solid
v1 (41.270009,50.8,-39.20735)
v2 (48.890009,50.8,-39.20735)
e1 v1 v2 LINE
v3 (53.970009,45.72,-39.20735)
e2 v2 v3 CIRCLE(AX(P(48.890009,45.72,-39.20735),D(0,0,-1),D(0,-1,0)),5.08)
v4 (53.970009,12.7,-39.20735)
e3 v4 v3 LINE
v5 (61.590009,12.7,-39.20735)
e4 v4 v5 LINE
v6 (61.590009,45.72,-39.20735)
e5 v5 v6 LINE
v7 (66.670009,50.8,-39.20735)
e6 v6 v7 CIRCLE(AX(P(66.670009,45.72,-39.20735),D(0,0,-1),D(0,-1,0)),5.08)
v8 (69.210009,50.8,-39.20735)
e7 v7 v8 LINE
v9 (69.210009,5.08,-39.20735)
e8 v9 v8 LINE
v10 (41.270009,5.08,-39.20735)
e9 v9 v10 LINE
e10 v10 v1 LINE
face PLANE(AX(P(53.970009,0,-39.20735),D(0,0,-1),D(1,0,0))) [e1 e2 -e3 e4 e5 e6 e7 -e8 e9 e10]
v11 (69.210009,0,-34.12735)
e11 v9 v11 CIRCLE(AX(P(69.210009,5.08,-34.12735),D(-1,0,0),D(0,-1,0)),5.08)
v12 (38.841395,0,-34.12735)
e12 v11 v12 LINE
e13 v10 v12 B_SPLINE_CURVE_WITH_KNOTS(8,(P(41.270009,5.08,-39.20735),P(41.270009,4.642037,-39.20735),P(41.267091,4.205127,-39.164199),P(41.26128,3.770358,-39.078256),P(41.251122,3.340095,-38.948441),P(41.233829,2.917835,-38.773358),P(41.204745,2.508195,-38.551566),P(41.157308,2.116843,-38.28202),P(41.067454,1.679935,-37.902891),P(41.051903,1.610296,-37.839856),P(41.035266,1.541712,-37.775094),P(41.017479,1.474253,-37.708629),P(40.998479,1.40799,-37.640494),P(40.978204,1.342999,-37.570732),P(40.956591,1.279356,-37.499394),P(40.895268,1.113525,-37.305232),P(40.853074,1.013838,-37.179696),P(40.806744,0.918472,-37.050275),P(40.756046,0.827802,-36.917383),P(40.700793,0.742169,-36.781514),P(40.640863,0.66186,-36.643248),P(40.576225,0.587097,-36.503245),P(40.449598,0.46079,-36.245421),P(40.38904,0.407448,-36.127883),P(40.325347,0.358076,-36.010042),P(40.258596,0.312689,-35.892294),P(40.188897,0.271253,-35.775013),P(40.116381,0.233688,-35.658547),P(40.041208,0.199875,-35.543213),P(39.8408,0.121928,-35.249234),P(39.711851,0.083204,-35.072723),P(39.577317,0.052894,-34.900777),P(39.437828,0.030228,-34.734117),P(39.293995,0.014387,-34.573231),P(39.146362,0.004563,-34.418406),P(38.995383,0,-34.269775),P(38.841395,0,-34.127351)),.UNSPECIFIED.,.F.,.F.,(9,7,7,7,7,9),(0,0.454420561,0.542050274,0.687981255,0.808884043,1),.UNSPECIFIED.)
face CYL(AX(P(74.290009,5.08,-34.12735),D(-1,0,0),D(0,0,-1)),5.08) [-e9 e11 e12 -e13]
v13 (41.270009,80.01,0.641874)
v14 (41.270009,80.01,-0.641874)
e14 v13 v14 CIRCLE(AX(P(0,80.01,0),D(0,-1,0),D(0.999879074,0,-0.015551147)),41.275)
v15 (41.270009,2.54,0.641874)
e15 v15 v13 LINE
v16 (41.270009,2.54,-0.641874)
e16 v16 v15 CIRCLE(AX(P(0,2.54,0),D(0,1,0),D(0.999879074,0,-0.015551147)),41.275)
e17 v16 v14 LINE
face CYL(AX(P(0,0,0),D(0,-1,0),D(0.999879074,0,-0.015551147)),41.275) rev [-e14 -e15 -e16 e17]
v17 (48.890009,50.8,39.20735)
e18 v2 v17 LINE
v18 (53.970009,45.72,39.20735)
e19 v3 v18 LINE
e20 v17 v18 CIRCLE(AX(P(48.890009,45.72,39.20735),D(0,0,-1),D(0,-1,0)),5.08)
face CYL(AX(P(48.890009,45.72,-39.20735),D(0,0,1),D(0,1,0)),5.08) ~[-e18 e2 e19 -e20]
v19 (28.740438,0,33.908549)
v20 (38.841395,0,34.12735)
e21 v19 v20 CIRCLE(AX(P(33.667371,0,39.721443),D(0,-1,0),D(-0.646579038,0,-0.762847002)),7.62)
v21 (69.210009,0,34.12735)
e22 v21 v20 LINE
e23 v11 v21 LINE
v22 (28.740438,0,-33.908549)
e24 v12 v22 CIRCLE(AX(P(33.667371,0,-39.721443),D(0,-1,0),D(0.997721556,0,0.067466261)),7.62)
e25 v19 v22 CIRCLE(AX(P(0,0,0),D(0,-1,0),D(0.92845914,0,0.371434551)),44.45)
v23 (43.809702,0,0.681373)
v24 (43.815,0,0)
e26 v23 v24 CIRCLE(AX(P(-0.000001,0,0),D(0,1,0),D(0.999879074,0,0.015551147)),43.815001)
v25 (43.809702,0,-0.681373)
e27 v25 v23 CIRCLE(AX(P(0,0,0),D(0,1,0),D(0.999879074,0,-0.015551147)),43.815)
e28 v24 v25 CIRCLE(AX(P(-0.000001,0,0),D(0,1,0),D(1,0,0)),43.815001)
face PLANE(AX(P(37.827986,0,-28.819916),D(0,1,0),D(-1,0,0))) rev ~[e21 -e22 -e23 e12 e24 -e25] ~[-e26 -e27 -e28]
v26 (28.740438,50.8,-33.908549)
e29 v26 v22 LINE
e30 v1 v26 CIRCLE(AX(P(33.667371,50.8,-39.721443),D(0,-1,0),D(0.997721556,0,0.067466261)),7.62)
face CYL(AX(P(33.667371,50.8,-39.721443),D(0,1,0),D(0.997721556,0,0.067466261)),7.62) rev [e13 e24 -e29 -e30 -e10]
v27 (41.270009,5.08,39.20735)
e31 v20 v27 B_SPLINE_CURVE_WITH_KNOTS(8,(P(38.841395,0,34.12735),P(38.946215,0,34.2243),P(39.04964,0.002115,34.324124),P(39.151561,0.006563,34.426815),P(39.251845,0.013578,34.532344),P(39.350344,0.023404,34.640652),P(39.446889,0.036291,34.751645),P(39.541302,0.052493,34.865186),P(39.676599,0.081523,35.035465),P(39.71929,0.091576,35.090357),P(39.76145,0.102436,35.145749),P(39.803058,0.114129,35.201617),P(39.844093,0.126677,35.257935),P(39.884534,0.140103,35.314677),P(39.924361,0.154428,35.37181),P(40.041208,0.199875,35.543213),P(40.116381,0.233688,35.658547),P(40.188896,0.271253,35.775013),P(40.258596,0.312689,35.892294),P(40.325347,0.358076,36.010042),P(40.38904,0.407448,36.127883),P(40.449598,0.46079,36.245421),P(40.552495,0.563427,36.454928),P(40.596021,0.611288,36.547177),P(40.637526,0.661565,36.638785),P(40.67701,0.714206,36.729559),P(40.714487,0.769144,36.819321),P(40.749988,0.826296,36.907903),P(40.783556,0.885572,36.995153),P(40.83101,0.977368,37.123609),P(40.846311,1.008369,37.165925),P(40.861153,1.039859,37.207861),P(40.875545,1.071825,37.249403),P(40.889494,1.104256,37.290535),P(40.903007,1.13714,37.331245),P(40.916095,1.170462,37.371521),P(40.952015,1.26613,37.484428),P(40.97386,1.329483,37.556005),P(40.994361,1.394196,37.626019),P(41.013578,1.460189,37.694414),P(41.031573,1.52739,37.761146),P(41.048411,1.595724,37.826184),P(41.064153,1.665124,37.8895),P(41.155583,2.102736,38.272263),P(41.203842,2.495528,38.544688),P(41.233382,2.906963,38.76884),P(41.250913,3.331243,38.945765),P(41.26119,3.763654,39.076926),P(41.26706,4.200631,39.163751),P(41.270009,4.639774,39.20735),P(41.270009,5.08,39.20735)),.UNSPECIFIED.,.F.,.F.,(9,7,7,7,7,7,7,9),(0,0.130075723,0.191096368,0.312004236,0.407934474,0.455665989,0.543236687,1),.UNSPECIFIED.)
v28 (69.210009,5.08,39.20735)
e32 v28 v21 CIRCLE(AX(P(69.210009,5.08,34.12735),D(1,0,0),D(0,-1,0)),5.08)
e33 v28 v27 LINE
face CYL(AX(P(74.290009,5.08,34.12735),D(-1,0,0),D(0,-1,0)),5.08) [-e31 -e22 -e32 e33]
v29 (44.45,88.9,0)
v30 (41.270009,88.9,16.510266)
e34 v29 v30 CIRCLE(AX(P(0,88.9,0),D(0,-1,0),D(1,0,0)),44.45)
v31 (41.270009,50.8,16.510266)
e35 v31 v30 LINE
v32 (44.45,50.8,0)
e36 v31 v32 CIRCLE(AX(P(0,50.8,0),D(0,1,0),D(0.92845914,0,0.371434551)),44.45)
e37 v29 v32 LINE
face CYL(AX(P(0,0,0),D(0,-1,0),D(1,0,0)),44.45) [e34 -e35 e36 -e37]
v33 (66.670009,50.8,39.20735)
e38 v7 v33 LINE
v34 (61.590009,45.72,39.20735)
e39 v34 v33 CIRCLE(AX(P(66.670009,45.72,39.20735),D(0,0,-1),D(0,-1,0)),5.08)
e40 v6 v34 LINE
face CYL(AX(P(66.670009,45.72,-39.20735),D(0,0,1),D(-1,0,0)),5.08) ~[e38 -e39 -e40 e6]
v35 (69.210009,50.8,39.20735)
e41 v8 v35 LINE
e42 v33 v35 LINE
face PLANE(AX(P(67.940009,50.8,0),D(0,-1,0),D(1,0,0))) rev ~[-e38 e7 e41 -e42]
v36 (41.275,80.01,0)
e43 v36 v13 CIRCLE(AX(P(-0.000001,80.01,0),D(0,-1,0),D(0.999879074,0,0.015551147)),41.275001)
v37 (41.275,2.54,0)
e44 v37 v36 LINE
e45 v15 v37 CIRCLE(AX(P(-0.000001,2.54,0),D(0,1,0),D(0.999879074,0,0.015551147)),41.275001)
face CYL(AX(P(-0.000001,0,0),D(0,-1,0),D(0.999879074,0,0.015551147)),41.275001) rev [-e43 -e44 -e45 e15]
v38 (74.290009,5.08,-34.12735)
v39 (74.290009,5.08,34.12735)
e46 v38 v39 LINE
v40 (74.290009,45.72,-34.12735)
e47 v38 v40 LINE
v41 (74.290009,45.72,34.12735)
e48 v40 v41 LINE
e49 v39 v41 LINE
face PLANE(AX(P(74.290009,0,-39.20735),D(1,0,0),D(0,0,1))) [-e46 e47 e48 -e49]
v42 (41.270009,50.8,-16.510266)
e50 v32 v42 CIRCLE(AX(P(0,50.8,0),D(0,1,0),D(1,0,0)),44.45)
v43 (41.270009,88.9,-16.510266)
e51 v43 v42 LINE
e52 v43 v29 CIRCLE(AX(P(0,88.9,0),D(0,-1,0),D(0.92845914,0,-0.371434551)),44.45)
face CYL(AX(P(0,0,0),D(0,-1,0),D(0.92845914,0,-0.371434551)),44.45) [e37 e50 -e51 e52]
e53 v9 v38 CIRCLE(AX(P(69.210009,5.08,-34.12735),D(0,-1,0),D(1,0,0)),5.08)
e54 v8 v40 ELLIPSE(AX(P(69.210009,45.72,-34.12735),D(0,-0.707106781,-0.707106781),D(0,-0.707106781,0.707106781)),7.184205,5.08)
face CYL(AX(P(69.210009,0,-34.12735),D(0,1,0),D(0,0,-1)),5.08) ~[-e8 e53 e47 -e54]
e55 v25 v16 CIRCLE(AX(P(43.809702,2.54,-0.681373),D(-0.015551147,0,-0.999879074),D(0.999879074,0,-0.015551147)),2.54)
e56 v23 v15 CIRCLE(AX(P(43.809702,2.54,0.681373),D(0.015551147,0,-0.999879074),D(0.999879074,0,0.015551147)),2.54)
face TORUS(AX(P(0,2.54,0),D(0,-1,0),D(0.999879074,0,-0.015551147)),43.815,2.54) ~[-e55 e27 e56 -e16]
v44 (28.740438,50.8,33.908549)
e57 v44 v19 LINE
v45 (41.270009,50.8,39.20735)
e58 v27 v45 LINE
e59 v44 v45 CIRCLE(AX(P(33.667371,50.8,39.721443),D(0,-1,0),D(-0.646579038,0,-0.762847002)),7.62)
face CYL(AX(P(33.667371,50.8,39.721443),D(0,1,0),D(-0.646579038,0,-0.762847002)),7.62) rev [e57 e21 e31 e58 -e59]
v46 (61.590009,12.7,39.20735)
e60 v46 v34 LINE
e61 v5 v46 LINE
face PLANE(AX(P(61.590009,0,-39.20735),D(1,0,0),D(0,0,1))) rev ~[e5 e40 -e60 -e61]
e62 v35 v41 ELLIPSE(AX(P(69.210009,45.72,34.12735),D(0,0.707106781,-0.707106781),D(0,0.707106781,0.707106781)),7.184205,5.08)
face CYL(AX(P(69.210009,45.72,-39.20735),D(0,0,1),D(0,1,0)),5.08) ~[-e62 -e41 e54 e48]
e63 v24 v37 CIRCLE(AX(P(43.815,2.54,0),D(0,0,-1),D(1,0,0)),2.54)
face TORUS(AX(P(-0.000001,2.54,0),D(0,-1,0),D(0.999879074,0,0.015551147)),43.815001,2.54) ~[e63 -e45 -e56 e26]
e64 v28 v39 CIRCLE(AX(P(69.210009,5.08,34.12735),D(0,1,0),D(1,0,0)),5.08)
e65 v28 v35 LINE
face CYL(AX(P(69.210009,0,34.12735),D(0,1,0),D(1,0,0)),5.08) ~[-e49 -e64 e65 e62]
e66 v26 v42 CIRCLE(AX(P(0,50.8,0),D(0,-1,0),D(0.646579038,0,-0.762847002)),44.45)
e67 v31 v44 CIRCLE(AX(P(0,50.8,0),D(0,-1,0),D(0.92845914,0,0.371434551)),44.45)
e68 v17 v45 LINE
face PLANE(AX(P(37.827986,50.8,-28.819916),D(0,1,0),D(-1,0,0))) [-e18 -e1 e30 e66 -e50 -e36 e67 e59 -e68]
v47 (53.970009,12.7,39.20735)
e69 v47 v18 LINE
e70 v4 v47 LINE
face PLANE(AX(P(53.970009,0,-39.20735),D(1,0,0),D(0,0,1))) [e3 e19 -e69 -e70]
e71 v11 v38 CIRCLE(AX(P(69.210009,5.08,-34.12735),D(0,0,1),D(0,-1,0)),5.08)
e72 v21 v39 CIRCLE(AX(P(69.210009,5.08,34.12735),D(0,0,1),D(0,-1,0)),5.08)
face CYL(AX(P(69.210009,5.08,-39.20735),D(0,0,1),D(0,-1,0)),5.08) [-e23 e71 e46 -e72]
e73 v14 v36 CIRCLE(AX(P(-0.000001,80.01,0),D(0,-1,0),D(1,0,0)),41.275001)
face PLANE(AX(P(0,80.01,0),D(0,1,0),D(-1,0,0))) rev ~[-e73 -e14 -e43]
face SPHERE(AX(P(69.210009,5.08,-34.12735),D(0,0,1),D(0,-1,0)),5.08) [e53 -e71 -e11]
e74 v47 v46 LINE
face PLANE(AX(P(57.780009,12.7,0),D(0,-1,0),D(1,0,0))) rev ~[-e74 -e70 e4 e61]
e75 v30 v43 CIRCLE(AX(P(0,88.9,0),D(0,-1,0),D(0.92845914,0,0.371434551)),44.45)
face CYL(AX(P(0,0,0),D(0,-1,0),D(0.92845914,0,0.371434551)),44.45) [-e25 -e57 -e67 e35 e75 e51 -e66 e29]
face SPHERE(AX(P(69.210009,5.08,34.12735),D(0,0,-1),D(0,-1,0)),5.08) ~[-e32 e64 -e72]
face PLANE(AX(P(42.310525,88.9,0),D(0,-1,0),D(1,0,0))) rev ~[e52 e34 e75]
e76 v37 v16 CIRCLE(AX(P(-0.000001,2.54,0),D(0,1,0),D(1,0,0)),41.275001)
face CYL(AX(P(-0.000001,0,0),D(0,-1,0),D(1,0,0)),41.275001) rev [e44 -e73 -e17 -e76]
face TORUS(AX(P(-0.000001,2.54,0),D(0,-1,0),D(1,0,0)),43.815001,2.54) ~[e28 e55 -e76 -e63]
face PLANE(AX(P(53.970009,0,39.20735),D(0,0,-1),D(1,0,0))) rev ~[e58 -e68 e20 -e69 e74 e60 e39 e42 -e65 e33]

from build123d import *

# Parameters (mm, degrees)
F1_DEPTH    = 50.8
F0_W        = 12.7
F0_H        = 78.4147009254
F0_W_2      = 7.62
F2_DEPTH    = 12.7
F3_DEPTH    = 88.9
F5_DEPTH    = 88.9
F7_T1_DEPTH = 50.8
F8_R        = 5.08
F9_R        = 2.54
F11_R       = 44.45
F12_DEPTH   = 8.89


# Not quite as in the source:
# - a fillet or chamfer that OpenCascade refuses, or shapes differently, is made with other operations: its cross-section is extruded or revolved along the edge and cut away or added


with BuildPart() as f1:
    # F0 (on Front) → F1 (new body)
    with BuildSketch(Plane.XZ):
        with BuildLine():
            ThreePointArc((41.2700087631, 16.5102657972), (43.6477627692, 8.4068606055), (44.45, 0))
            ThreePointArc((44.45, 0), (43.6477627692, -8.4068606055), (41.2700087631, -16.5102657972))
            Line((41.2700087631, -16.5102657972), (41.2700087631, -39.2073504627))
            Line((41.2700087631, -39.2073504627), (53.9700087631, -39.2073504627))
            Line((53.9700087631, -39.2073504627), (53.9700087631, 39.2073504627))
            Line((53.9700087631, 39.2073504627), (41.2700087631, 39.2073504627))
            Line((41.2700087631, 39.2073504627), (41.2700087631, 16.5102657972))
        make_face()
    extrude(amount=-F1_DEPTH)



with BuildPart() as f1b:
    # F0 (on Front) → F1, piece 2 (new body)
    with BuildSketch(Plane.XZ):
        with Locations((67.9400087631, 0)):
            Rectangle(F0_W, F0_H)
    extrude(amount=-F1_DEPTH)


with BuildPart() as f1_1:
    add(f1.part)

    add(f1b.part)  # F2 merges F1b
    # F0 (on Front) → F2 (join)
    with BuildSketch(Plane.XZ):
        with Locations((57.7800087631, 0)):
            Rectangle(F0_W_2, F0_H)
    extrude(amount=-F2_DEPTH)

    # F0 (on Front) → F3 (join)
    with BuildSketch(Plane.XZ):
        with BuildLine():
            Line((41.2700087631, 0.6418735824), (41.2700087631, 16.5102657972))
            ThreePointArc((41.2700087631, 16.5102657972), (-44.45, 0), (41.2700087631, -16.5102657972))
            Line((41.2700087631, -16.5102657972), (41.2700087631, -0.6418735824))
            ThreePointArc((41.2700087631, -0.6418735824), (-41.275, 0), (41.2700087631, 0.6418735824))
        make_face()
    extrude(amount=-F3_DEPTH)

    # F4: union 

    # F0 (on Front) → F5 (join)
    with BuildSketch(Plane.XZ):
        with BuildLine():
            ThreePointArc((41.2700087631, -16.5102657972), (43.6477627692, -8.4068606055), (44.45, 0))
            ThreePointArc((44.45, 0), (43.6477627692, 8.4068606055), (41.2700087631, 16.5102657972))
            Line((41.2700087631, 16.5102657972), (41.2700087631, 0.6418735824))
            ThreePointArc((41.2700087631, 0.6418735824), (41.2737521719, 0.3209464941), (41.275, 0))
            ThreePointArc((41.275, 0), (41.2737521719, -0.3209464941), (41.2700087631, -0.6418735824))
            Line((41.2700087631, -0.6418735824), (41.2700087631, -16.5102657972))
        make_face()
    extrude(amount=-F5_DEPTH)

    # F6: union 

    # F7: fillet of radius 7.62 on 2 edges, made by hand

    # F7_s2 → F7_t1 (join)
    with BuildSketch(Plane.XZ.offset(-50.8)):
        with BuildLine():
            ThreePointArc((41.2700087631, -39.2073504627), (36.6353958241, -32.7032366386), (28.7404382359, -33.9085492171))
            ThreePointArc((28.7404382359, -33.9085492171), (36.0699423168, -25.9761768022), (41.2700087631, -16.5102657972))
            Line((41.2700087631, -16.5102657972), (41.2700087631, -39.2073504627))
        make_face()
        with BuildLine():
            ThreePointArc((28.7404382359, 33.9085492171), (36.6353958241, 32.7032366386), (41.2700087631, 39.2073504627))
            Line((41.2700087631, 39.2073504627), (41.2700087631, 16.5102657972))
            ThreePointArc((41.2700087631, 16.5102657972), (36.0699423168, 25.9761768022), (28.7404382359, 33.9085492171))
        make_face()
    extrude(amount=F7_T1_DEPTH)

    # F8
    f8_edges = [f1_1.edges().sort_by_distance(p)[0] for p in [
        (53.970009, 50.8, 0),
        (61.590009, 50.8, 0),
        (74.290009, 0, 0),
        (57.780009, 0, -39.20735),
        (57.780009, 0, 39.20735),
        (74.290009, 50.8, 0),
        (74.290009, 25.4, -39.20735),
        (74.290009, 25.4, 39.20735),
    ]]
    fillet(f8_edges, radius=F8_R)

    # F9
    f9_edges = [f1_1.edges().sort_by_distance(p)[0] for p in [
        (-41.270009, 0, -0.641874),
    ]]
    fillet(f9_edges, radius=F9_R)

    # F11 (on offset) → F12 (join)
    with BuildSketch(Plane(origin=(0, 88.9, 0), x_dir=(-1, 0, 0), z_dir=(0, 1, 0))):
        Circle(F11_R)
    extrude(amount=-F12_DEPTH)


solid = f1_1.part
